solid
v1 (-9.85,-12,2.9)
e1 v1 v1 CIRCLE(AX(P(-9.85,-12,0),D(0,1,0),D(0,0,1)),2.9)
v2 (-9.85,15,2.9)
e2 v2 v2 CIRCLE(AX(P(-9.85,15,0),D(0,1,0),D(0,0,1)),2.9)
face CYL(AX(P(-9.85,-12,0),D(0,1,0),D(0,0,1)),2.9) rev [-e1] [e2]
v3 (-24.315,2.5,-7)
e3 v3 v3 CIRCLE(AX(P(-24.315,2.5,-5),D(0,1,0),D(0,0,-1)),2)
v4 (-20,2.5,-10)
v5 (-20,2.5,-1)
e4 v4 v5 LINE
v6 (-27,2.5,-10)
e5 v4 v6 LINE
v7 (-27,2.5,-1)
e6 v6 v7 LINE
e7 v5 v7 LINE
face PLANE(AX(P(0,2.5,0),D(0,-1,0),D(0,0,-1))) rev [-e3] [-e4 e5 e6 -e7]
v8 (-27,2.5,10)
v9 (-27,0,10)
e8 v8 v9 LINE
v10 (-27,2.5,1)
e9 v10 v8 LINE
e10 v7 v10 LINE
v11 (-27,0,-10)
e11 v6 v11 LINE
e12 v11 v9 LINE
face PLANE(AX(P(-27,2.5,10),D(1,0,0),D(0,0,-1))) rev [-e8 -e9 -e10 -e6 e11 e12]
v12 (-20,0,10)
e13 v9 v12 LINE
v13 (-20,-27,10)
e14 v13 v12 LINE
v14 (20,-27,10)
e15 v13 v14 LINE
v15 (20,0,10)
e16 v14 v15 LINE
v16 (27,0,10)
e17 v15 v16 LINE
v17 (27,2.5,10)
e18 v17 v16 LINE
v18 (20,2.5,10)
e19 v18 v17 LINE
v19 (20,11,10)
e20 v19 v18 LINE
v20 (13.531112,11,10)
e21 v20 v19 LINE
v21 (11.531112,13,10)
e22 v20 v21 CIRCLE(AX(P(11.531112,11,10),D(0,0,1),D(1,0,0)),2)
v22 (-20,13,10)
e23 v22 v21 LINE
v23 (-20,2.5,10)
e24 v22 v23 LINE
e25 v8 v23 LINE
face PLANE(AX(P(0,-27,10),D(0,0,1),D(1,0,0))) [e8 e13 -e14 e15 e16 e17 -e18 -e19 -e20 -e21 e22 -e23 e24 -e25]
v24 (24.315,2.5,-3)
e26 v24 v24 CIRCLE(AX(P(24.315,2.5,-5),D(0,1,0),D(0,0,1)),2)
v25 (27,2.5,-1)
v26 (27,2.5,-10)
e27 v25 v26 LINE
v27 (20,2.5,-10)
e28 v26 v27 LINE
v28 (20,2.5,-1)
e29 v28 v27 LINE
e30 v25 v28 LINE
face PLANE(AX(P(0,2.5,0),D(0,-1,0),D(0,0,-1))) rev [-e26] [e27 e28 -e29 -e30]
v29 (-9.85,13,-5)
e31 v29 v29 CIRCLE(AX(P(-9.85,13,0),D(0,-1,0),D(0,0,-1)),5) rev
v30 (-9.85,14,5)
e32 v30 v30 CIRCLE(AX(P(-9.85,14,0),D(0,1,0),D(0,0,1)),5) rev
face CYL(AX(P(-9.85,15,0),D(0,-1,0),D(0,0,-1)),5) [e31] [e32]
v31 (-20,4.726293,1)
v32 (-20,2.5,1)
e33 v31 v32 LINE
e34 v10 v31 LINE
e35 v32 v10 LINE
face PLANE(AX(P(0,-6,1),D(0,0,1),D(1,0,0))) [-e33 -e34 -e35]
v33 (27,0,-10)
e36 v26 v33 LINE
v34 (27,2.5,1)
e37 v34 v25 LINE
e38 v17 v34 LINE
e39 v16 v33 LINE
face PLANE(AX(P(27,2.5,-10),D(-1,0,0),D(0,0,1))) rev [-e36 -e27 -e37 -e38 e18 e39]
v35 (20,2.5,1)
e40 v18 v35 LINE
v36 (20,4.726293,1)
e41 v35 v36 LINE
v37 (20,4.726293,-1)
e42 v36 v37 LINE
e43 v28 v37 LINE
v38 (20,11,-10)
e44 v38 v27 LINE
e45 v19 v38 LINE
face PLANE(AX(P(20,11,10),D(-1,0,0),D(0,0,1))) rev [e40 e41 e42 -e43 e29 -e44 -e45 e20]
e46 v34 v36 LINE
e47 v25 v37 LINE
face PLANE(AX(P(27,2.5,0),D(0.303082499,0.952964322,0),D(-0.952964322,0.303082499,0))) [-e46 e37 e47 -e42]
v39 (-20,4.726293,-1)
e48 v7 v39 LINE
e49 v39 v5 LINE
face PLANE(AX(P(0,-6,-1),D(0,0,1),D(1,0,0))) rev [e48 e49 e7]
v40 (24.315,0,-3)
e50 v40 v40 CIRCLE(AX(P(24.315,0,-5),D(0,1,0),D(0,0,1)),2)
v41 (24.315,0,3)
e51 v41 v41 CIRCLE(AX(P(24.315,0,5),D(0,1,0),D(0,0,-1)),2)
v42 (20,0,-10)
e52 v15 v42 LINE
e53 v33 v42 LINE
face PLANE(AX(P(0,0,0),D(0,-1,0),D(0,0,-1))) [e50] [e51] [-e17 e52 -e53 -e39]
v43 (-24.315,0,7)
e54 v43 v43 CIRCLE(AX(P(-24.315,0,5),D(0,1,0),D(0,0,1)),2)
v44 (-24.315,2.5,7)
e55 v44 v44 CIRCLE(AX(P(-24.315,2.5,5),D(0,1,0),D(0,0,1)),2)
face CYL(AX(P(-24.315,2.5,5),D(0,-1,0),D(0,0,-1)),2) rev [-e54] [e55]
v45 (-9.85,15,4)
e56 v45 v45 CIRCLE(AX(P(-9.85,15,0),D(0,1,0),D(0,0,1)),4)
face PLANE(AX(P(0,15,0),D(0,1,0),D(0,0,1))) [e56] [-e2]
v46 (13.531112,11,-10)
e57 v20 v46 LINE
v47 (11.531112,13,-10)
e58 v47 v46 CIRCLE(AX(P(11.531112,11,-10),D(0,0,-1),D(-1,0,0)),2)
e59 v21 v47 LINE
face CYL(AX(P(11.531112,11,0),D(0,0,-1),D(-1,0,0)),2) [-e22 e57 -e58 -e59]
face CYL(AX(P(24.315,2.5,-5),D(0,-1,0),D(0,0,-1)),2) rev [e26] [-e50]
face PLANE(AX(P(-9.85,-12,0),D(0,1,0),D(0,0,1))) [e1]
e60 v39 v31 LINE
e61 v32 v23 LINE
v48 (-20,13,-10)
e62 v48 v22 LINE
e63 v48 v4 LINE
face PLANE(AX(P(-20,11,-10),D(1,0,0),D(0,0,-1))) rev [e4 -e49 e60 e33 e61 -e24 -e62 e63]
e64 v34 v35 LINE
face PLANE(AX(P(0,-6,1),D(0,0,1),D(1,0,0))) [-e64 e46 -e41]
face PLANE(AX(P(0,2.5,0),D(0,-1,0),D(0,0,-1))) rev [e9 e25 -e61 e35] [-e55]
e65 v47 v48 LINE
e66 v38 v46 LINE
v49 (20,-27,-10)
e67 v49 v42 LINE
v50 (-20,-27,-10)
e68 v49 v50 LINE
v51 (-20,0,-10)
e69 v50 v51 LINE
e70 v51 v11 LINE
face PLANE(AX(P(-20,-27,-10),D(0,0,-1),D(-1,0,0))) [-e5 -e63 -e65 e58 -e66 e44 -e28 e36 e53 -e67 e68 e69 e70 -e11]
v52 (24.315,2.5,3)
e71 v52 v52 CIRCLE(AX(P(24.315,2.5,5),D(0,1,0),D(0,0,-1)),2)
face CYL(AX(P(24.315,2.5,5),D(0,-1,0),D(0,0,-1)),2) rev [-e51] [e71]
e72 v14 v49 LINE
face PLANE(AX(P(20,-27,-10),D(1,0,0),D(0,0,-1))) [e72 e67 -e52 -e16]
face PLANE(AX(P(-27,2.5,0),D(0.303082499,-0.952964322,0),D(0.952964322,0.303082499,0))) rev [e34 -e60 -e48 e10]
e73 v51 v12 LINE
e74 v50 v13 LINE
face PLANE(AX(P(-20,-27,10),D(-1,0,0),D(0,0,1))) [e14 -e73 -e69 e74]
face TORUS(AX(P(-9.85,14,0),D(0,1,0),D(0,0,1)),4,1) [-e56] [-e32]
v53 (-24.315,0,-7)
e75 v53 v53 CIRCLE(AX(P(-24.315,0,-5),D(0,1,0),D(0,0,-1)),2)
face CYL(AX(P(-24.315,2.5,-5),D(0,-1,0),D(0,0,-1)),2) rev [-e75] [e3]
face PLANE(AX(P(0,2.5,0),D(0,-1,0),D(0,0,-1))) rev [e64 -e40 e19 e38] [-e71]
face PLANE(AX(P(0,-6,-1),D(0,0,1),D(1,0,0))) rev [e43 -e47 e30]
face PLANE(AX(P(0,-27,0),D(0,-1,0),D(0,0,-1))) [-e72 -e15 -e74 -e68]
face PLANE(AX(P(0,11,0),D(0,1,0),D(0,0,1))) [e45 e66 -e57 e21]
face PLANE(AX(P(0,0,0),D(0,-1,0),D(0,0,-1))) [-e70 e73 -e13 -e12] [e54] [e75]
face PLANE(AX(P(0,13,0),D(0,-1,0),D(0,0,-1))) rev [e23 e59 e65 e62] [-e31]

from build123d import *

# Parameters (mm, degrees)
EXTRUDE_1_DEPTH     = 27
SKETCH_3_R          = 2
EXTRUDE_2_DEPTH     = 2.5
EXTRUDE_3_DEPTH     = 8.5
SKETCH_5_W          = 33.531111889
SKETCH_5_H          = 20
EXTRUDE_4_DEPTH     = 2
FILLET_5_R          = 2
SKETCH_6_R          = 5
EXTRUDE_5_DEPTH     = 2
FILLET_7_R          = 1
SKETCH_7_R          = 2.9
CUT_EXTRUDE_1_DEPTH = 27
RIB_8_REACH         = 41.472
SKETCH_8_WALL_W     = 88.288518024
SKETCH_8_WALL_H     = 2


with BuildPart() as part:
    # 草图2 → 凸台-拉伸1 (new body)
    with BuildSketch(Plane(origin=(0, 0, 0), x_dir=(1, 0, 0), z_dir=(0, 1, 0))):
        Polygon((0, -10), (-20, -10), (-20, 10), (20, 10), (20, -10), align=None)
    extrude(amount=-EXTRUDE_1_DEPTH)

    # 草图3 → 凸台-拉伸2 (add)
    with BuildSketch(Plane(origin=(0, 0, 0), x_dir=(1, 0, 0), z_dir=(0, 1, 0))):
        Polygon((0, 10), (27, 10), (27, -10), (-27, -10), (-27, 10), align=None)
        with Locations(Location((-24.315, -5, 0), (0, 0, 270))):
            Circle(SKETCH_3_R, mode=Mode.SUBTRACT)
        with Locations(Location((-24.315, 5, 0), (0, 0, 90))):
            Circle(SKETCH_3_R, mode=Mode.SUBTRACT)
        with Locations(Location((24.315, -5, 0), (0, 0, 90))):
            Circle(SKETCH_3_R, mode=Mode.SUBTRACT)
        with Locations(Location((24.315, 5, 0), (0, 0, 270))):
            Circle(SKETCH_3_R, mode=Mode.SUBTRACT)
    extrude(amount=EXTRUDE_2_DEPTH)

    # 草图4 → 凸台-拉伸3 (add)
    with BuildSketch(Plane(origin=(0, 2.5, 0), x_dir=(1, 0, 0), z_dir=(0, 1, 0))):
        Polygon((0, 10), (-20, 10), (-20, -10), (20, -10), (20, 10), align=None)
    extrude(amount=EXTRUDE_3_DEPTH)

    # 草图5 → 凸台-拉伸4 (add)
    with BuildSketch(Plane(origin=(0, 11, 0), x_dir=(1, 0, 0), z_dir=(0, 1, 0))):
        with Locations((-3.234444055, 0)):
            Rectangle(SKETCH_5_W, SKETCH_5_H)
    extrude(amount=EXTRUDE_4_DEPTH)

    # 圆角5
    fillet_5_edges = [part.edges().sort_by_distance(p)[0] for p in [
        (13.531111889, 13, 0),
    ]]
    fillet(fillet_5_edges, radius=FILLET_5_R - 0.0001)  # a hair under: the kernel refuses the full size

    # 草图6 → 凸台-拉伸5 (add)
    with BuildSketch(Plane(origin=(0, 13, 0), x_dir=(1, 0, 0), z_dir=(0, 1, 0))):
        with Locations(Location((-9.85, 0, 0), (0, 0, 90))):
            Circle(SKETCH_6_R)
    extrude(amount=EXTRUDE_5_DEPTH)

    # 圆角7
    fillet_7_edges = [part.edges().sort_by_distance(p)[0] for p in [
        (-9.85, 15, 5),
    ]]
    fillet(fillet_7_edges, radius=FILLET_7_R)

    # 草图7 → 切除-拉伸1 (cut)
    with BuildSketch(Plane(origin=(0, 15, 0), x_dir=(1, 0, 0), z_dir=(0, 1, 0))):
        with Locations(Location((-9.85, 0, 0), (0, 0, 270))):
            Circle(SKETCH_7_R)
    extrude(amount=-CUT_EXTRUDE_1_DEPTH, mode=Mode.SUBTRACT)

    # 草图8 wall → 筋8 (add, up to next)
    with BuildSketch(Plane(origin=(-23.5, 3.613146338, 0), x_dir=(0.952964322003, 0.303082498652, 0), z_dir=(-0.303082498652, 0.952964322003, 0)), mode=Mode.PRIVATE) as rib_8_sk1:
        Rectangle(SKETCH_8_WALL_W, SKETCH_8_WALL_H)
    rib_8_tool1 = extrude(rib_8_sk1.sketch, amount=-RIB_8_REACH, mode=Mode.PRIVATE) - part.part
    rib_8 = rib_8_tool1.solids().sort_by_distance((-23.5, 3.613146338, 0))[0]
    add(rib_8)

    # 镜向1: 筋8 across plane
    add(rib_8.mirror(Plane(origin=(0, 0, 0), x_dir=(0, 0, 1), z_dir=(1, 0, 0))))


solid = part.part
